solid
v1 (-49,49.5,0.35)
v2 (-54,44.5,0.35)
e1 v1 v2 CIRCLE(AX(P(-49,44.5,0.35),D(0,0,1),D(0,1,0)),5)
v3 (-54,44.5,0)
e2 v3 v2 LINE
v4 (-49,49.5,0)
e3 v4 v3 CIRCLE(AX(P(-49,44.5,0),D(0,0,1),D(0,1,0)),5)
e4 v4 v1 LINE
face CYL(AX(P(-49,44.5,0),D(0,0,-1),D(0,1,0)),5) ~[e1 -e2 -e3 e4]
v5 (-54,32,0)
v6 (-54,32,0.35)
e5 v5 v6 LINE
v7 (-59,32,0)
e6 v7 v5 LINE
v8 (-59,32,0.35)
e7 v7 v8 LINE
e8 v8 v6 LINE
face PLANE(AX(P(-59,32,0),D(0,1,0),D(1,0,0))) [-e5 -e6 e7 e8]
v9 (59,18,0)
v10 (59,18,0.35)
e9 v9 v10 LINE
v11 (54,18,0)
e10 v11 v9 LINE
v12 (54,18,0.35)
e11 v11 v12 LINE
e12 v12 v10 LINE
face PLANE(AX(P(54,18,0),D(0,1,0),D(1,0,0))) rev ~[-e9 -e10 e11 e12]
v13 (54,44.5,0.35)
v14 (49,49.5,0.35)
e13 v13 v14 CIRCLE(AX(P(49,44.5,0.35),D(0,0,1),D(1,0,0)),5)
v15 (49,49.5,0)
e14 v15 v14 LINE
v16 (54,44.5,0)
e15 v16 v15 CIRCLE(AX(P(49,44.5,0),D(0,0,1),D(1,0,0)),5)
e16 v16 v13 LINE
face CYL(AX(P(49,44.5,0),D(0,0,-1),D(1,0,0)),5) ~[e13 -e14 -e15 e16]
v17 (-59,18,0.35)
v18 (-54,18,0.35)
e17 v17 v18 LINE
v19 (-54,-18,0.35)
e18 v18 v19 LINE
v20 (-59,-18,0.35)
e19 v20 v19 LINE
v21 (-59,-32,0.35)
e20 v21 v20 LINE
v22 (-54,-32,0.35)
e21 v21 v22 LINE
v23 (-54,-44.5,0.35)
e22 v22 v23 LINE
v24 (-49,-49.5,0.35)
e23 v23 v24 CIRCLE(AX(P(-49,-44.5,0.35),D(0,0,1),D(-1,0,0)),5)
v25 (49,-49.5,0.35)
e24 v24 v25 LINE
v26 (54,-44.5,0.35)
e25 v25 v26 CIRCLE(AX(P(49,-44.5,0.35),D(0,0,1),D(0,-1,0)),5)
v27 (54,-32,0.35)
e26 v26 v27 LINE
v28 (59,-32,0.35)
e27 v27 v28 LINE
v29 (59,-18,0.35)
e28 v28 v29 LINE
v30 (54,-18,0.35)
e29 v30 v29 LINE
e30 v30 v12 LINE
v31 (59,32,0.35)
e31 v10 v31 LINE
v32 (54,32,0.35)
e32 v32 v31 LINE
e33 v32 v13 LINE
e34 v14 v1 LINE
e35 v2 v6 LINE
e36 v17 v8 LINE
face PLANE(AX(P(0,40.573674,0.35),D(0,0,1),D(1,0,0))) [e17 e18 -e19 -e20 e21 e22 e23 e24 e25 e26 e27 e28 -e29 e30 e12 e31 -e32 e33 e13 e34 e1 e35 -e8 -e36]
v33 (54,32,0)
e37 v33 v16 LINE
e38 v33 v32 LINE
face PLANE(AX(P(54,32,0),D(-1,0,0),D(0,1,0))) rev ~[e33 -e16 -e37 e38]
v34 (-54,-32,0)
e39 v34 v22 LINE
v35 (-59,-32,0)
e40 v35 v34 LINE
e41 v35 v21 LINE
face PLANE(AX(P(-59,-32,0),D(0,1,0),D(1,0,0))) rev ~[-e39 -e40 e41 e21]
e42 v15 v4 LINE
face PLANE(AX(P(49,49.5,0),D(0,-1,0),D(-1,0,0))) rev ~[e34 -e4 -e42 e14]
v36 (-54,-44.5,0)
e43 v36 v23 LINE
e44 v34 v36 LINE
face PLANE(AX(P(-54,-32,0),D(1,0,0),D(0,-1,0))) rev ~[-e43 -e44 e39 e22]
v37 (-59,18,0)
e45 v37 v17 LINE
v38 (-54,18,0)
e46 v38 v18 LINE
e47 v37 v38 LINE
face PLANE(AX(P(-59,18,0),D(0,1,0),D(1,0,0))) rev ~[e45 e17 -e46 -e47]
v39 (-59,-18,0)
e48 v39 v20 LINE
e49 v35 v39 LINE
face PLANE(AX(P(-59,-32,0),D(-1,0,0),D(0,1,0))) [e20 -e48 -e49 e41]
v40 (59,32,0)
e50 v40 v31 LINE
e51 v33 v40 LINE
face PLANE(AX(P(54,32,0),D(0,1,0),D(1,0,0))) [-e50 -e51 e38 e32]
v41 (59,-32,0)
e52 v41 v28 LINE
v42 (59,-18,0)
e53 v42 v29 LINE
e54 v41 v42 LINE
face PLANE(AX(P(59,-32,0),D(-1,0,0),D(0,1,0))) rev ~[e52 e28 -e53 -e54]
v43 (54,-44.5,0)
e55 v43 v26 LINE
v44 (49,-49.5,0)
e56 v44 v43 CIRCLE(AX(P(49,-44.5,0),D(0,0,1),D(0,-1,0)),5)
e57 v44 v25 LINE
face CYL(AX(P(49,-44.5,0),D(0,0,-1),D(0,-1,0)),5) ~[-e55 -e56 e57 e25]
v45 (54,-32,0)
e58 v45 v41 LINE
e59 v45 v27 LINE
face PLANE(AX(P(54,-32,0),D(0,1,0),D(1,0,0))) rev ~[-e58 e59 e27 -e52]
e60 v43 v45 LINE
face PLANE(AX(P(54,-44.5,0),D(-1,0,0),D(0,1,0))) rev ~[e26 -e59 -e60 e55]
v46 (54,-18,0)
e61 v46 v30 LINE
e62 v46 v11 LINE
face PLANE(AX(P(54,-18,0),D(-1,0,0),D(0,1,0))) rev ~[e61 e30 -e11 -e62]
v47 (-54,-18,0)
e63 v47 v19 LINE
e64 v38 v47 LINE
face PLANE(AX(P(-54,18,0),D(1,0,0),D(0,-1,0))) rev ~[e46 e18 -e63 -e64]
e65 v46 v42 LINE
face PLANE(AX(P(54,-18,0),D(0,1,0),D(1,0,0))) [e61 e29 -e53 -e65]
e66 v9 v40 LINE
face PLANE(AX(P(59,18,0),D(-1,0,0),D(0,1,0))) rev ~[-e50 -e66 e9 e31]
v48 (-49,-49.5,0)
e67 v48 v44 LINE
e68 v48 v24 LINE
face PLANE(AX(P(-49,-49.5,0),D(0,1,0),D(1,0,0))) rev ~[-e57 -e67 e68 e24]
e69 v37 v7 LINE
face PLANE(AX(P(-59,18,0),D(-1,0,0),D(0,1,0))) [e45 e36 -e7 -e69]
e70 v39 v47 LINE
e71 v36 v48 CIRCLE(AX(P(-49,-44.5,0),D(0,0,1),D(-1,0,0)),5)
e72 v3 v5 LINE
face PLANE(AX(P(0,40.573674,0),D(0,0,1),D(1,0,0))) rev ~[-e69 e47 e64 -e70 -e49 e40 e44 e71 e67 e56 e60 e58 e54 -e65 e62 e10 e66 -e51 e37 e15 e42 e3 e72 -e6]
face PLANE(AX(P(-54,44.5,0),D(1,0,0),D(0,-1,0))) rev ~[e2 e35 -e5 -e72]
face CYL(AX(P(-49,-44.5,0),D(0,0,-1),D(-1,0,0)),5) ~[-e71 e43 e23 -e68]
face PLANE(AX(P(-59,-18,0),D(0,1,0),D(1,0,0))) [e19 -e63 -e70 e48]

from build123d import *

# Parameters (mm, degrees)
F0_W     = 5
F0_H     = 14
F0_W_2   = 108
F1_DEPTH = 0.35


with BuildPart() as f1:
    # F0 (on Top) → F1 (new body)
    with BuildSketch(Plane.XY):
        with BuildLine():
            ThreePointArc((54, 44.5), (52.5355339059, 48.0355339059), (49, 49.5))
            Line((49, 49.5), (-49, 49.5))
            ThreePointArc((-49, 49.5), (-52.5355339059, 48.0355339059), (-54, 44.5))
            Line((-54, 44.5), (-54, 32))
            Line((-54, 32), (54, 32))
            Line((54, 32), (54, 44.5))
        make_face()
        with Locations((56.5, 25)):
            Rectangle(F0_W, F0_H)
        Polygon((54, 18), (54, 32), (-54, 32), (-54, 18), (0, 18), align=None)
        with Locations((-56.5, 25)):
            Rectangle(F0_W, F0_H)
        Polygon((54, -18), (54, 18), (0, 18), (-54, 18), (-54, -18), align=None)
        with Locations((56.5, -25)):
            Rectangle(F0_W, F0_H)
        with Locations((0, -25)):
            Rectangle(F0_W_2, F0_H)
        with Locations((-56.5, -25)):
            Rectangle(F0_W, F0_H)
        with BuildLine():
            Line((54, -44.5), (54, -32))
            Line((54, -32), (-54, -32))
            Line((-54, -32), (-54, -44.5))
            ThreePointArc((-54, -44.5), (-52.5355339059, -48.0355339059), (-49, -49.5))
            Line((-49, -49.5), (49, -49.5))
            ThreePointArc((49, -49.5), (52.5355339059, -48.0355339059), (54, -44.5))
        make_face()
    extrude(amount=F1_DEPTH)


solid = f1.part
